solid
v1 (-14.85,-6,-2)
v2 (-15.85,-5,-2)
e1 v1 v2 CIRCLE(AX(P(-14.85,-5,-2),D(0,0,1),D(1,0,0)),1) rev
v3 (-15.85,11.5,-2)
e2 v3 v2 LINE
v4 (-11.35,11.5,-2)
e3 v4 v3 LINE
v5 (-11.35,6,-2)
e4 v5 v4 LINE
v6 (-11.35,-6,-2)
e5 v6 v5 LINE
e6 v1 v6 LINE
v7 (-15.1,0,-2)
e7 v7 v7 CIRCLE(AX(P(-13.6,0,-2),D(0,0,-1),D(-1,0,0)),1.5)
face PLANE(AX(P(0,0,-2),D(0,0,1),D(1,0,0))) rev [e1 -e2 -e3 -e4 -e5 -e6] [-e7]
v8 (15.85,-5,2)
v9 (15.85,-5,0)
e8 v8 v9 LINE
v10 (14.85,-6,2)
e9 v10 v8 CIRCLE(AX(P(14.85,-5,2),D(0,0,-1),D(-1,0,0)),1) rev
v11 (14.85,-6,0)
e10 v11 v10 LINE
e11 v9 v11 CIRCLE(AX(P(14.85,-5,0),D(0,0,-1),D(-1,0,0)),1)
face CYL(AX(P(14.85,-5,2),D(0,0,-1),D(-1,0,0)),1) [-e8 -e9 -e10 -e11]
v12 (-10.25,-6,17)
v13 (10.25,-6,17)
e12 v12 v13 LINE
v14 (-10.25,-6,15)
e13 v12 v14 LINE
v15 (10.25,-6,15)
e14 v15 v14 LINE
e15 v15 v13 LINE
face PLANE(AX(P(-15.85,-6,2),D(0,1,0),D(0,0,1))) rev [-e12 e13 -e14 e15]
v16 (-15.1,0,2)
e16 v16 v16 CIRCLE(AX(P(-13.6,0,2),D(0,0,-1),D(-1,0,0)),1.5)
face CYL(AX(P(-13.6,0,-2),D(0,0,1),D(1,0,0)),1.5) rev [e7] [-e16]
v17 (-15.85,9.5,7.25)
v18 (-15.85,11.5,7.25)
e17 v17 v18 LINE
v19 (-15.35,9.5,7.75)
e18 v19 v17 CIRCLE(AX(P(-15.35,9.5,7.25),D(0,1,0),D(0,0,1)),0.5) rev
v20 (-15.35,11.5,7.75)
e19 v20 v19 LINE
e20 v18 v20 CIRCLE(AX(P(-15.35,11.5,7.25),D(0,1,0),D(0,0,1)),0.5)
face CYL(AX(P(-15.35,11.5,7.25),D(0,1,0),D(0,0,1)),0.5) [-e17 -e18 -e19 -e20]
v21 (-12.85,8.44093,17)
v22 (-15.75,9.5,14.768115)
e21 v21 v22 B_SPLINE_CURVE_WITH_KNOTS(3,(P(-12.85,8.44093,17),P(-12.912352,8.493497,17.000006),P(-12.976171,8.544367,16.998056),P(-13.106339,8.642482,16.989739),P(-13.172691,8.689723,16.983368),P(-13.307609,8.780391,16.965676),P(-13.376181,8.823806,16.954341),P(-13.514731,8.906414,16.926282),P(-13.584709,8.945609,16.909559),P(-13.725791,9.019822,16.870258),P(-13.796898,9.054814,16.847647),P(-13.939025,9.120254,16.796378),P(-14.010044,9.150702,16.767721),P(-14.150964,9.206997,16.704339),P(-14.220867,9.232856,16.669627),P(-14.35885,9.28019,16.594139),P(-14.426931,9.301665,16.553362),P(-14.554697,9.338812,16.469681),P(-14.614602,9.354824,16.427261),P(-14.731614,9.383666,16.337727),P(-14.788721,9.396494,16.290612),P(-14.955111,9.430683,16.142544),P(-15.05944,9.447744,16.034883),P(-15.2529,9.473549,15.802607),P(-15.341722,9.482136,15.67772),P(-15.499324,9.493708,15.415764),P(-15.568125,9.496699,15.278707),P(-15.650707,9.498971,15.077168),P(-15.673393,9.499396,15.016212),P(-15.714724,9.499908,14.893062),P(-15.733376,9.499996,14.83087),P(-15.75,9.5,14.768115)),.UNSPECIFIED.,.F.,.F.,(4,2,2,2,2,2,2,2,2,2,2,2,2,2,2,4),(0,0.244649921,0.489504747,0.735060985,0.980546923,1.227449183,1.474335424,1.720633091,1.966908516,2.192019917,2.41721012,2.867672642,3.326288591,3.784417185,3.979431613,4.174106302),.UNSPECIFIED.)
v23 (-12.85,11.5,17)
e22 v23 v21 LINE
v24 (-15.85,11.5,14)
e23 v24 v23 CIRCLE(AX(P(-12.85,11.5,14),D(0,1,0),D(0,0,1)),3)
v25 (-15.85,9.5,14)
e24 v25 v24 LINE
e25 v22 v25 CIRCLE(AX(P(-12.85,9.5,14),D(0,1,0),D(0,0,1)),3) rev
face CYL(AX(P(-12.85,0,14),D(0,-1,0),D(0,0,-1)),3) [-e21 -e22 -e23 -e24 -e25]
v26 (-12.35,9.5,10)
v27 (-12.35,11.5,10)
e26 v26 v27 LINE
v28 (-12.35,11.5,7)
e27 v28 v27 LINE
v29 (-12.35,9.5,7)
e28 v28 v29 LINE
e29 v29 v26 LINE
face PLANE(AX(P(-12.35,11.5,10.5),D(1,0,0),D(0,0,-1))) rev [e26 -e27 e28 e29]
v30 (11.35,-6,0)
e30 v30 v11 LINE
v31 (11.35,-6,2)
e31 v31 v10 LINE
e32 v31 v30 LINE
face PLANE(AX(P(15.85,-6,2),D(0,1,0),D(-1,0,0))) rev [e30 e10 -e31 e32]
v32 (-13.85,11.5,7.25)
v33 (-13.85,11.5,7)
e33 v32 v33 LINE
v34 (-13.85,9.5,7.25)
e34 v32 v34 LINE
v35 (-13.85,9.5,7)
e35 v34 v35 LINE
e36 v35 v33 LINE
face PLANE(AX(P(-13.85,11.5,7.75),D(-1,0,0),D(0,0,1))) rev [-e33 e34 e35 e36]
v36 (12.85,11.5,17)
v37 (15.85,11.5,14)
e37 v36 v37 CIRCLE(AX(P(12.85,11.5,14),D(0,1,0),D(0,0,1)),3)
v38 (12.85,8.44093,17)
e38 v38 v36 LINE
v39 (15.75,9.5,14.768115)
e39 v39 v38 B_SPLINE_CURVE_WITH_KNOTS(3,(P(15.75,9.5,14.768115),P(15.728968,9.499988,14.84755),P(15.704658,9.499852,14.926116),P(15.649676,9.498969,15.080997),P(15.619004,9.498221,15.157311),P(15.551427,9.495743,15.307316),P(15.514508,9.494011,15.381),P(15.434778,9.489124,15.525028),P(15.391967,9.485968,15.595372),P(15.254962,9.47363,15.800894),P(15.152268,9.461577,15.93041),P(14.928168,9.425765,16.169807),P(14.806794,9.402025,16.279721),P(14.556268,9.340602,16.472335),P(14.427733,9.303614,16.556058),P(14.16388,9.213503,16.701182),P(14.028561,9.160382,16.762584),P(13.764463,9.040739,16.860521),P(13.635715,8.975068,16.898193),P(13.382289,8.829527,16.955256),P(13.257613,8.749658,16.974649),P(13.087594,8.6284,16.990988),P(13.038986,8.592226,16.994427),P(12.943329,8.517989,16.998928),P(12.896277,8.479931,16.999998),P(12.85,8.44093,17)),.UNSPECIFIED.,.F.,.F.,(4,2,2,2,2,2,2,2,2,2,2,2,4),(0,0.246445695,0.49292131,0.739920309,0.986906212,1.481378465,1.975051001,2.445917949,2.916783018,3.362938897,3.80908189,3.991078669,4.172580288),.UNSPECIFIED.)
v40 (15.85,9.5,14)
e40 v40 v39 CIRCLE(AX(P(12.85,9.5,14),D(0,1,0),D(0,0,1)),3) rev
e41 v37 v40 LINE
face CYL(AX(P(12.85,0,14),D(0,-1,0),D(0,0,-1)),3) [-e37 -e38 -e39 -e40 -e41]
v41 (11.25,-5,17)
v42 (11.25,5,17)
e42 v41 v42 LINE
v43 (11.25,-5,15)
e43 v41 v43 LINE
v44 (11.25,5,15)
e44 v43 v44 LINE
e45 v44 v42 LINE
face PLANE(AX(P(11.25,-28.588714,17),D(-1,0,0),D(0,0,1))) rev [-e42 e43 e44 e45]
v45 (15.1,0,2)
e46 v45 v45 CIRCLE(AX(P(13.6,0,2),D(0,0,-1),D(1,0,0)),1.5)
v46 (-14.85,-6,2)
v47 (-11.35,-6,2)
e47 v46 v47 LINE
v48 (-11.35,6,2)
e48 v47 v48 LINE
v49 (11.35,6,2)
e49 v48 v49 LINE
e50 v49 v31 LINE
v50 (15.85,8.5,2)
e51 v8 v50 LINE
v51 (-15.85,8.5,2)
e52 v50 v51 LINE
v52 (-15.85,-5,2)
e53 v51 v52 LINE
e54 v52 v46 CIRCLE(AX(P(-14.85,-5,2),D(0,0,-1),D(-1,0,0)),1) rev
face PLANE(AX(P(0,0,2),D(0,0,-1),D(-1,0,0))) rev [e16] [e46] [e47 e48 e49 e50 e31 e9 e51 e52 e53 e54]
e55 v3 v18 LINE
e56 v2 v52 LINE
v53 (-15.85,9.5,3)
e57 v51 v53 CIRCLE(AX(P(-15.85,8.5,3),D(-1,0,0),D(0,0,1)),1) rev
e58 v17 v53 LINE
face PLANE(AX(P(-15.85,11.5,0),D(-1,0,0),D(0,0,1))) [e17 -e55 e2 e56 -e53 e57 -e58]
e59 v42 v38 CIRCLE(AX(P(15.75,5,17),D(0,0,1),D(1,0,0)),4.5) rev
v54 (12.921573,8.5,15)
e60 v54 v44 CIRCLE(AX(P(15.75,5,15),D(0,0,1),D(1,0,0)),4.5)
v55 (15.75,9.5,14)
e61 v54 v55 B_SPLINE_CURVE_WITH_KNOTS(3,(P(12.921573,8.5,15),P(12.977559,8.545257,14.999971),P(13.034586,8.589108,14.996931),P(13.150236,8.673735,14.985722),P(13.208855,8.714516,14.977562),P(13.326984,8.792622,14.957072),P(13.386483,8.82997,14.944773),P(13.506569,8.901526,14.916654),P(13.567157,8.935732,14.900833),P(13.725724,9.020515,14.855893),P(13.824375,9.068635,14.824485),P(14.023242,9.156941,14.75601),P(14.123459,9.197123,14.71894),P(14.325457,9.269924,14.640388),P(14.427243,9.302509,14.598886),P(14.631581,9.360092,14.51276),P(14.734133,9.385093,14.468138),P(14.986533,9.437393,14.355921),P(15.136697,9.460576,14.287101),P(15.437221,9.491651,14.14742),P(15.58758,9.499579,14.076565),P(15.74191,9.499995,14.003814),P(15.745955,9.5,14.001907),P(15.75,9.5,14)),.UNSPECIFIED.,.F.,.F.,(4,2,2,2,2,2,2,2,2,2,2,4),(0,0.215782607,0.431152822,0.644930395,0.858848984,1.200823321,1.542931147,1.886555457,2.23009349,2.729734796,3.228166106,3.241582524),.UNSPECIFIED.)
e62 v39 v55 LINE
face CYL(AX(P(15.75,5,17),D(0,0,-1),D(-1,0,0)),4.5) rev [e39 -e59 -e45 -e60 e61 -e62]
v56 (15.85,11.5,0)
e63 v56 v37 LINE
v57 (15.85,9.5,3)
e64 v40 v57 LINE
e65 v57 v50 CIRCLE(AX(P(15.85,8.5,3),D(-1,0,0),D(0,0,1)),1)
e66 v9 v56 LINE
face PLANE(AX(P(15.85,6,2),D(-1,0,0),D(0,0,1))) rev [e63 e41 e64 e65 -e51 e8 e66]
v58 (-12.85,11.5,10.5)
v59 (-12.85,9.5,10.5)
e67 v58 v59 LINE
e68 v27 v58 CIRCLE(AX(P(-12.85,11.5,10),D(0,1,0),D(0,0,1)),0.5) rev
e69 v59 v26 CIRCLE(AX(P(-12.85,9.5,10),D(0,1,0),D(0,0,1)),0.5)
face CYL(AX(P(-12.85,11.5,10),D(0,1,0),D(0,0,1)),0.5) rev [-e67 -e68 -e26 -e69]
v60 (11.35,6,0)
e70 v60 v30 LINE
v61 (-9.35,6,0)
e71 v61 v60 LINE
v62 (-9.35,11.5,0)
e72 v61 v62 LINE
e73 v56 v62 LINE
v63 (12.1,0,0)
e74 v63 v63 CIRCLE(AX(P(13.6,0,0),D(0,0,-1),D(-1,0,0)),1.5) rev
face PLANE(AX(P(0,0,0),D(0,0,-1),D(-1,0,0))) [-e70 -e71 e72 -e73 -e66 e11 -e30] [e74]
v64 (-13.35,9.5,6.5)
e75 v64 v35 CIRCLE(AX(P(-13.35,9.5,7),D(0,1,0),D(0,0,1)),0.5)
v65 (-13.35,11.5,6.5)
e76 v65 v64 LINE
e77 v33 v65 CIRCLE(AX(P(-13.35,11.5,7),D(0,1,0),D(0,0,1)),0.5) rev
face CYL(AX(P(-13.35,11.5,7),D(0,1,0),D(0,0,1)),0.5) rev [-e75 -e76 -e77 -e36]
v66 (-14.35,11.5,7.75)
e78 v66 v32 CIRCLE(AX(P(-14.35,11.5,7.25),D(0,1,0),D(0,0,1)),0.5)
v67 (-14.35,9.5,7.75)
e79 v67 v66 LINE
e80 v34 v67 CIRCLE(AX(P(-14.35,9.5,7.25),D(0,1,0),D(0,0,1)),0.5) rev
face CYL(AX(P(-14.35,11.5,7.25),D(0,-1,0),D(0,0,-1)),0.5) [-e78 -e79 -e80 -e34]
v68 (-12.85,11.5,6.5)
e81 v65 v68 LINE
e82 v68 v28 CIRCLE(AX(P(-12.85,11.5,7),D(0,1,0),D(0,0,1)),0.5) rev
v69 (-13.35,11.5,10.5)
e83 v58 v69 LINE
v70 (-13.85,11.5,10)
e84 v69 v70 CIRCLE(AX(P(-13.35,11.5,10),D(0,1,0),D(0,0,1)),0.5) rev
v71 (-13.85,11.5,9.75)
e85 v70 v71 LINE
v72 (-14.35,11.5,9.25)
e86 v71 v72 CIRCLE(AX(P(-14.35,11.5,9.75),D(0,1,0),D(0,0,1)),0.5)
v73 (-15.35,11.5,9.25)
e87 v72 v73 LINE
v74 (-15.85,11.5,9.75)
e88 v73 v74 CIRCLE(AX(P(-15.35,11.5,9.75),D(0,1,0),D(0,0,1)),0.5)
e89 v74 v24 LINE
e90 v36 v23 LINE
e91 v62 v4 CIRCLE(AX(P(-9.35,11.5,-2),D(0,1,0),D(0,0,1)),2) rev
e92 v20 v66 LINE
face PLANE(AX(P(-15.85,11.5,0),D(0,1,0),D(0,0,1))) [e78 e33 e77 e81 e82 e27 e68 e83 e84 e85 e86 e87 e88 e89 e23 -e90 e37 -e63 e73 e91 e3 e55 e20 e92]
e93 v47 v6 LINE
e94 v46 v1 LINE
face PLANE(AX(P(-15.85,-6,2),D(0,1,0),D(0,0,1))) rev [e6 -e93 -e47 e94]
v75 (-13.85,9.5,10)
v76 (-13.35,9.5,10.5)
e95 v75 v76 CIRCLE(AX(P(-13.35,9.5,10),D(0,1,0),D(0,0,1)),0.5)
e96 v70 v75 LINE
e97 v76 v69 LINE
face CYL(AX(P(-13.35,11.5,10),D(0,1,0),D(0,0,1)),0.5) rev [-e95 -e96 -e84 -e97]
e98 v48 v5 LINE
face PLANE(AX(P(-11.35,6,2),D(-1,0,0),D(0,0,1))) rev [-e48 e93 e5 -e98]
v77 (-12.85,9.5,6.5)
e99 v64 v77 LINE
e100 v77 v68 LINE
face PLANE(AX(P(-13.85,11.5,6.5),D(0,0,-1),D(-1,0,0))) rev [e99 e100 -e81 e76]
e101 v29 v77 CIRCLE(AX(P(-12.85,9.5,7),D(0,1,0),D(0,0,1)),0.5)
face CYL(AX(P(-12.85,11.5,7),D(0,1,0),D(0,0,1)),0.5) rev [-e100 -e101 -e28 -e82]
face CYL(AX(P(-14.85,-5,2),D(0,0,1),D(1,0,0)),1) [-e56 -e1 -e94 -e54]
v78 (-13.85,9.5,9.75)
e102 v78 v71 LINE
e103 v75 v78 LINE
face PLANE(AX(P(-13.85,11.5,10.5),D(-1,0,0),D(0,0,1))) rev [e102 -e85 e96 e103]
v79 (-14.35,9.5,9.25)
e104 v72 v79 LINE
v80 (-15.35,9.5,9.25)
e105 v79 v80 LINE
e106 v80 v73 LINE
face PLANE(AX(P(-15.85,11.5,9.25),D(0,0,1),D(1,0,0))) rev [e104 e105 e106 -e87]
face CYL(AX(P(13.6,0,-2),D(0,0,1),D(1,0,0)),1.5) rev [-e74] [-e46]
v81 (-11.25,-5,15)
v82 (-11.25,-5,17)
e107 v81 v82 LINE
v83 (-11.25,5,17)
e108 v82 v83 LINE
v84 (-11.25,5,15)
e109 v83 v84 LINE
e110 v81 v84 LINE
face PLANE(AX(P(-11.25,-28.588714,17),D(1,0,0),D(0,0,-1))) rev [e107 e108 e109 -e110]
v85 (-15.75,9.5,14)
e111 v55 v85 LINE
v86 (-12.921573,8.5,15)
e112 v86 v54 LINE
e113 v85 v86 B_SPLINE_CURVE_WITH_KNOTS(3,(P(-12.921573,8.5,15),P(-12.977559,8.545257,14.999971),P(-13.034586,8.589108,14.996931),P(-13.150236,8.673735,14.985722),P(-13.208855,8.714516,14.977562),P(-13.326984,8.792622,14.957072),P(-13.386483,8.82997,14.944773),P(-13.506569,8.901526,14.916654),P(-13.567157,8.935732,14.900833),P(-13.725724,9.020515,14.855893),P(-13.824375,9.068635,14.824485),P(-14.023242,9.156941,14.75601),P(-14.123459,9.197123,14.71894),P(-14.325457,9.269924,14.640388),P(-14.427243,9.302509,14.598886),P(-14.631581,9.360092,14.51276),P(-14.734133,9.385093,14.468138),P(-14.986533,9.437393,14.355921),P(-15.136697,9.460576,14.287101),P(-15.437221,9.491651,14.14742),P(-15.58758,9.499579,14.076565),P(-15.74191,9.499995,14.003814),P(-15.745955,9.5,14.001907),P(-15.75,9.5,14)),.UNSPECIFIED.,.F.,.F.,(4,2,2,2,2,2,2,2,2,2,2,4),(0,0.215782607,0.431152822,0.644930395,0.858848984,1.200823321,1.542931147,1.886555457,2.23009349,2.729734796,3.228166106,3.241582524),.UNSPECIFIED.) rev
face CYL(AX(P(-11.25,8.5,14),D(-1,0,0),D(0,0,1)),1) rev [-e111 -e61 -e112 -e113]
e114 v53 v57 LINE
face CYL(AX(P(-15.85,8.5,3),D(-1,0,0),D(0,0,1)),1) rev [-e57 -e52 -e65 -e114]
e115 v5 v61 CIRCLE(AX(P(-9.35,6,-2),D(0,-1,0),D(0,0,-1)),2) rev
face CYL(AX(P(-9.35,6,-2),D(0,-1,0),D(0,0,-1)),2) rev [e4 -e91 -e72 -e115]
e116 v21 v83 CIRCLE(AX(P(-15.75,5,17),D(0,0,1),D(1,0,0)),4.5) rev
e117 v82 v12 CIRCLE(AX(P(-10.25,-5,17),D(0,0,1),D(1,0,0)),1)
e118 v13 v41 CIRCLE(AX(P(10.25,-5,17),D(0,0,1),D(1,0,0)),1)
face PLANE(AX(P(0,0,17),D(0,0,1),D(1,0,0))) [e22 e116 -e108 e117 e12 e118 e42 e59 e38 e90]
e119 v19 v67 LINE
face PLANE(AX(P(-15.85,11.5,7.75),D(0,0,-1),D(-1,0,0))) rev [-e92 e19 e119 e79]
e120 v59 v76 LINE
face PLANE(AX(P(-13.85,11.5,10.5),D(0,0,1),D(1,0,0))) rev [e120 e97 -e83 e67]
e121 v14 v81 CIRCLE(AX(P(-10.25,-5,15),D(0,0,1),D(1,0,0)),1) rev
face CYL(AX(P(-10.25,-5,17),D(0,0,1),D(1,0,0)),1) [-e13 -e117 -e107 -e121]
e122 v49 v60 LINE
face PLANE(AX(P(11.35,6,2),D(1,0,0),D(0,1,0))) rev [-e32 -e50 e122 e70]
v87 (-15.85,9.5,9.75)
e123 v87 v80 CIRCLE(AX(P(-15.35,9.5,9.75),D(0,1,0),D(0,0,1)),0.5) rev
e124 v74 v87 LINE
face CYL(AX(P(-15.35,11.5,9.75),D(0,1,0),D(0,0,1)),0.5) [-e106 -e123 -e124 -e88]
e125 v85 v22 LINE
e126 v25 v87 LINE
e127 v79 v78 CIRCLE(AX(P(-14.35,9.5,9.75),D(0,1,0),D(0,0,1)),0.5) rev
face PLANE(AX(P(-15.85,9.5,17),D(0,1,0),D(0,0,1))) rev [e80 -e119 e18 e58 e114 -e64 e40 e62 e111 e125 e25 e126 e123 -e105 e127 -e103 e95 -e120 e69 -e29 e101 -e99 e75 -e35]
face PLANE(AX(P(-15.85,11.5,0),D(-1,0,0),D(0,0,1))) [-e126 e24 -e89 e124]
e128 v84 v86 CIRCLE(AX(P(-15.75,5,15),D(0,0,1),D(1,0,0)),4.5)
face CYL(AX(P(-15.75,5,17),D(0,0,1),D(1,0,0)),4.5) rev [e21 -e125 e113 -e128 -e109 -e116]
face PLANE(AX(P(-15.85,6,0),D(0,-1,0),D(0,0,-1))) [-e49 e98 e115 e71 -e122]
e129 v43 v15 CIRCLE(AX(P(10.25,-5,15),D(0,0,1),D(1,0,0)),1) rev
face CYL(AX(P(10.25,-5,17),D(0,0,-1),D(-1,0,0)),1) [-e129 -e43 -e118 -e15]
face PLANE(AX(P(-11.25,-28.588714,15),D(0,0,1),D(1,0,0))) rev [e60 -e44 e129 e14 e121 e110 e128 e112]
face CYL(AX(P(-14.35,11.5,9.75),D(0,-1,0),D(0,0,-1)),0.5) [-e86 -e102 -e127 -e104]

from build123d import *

# Parameters (mm, degrees)
SKETCH_1_W          = 4.5
SKETCH_1_H          = 12
EXTRUDE_1_DEPTH     = 2
EXTRUDE_1_2_DEPTH   = 2
SKETCH_2_W          = 4.5
SKETCH_2_H          = 12
EXTRUDE_4_DEPTH     = 2
SKETCH_4_R          = 1.5
CUT_EXTRUDE_1_DEPTH = 18.413285158
SKETCH_5_W          = 31.7
SKETCH_5_H          = 5.5
EXTRUDE_5_DEPTH     = 2
SKETCH_6_W          = 31.7
SKETCH_6_H          = 2
EXTRUDE_6_DEPTH     = 15
SKETCH_7_W          = 22.5
SKETCH_7_H          = 2
EXTRUDE_7_DEPTH     = 15.5
FILLET_3_R          = 1
FILLET_4_R          = 4.5
FILLET_5_R          = 1
FILLET_6_R          = 3
SKETCH_8_W          = 4.5
SKETCH_8_H          = 2
EXTRUDE_8_DEPTH     = 5.5
FILLET_7_R          = 2
CUT_EXTRUDE_2_DEPTH = 28.936938031
FILLET_8_R          = 0.5


with BuildPart() as part:
    # 草图1 → 凸台-拉伸1 (new body)
    with BuildSketch(Plane.XY):
        with Locations((13.6, 0)):
            Rectangle(SKETCH_1_W, SKETCH_1_H)
    extrude(amount=EXTRUDE_1_DEPTH)


with BuildPart() as body_2:
    # 草图1 → Extrude 1 2 (new body)
    with BuildSketch(Plane.XY):
        with Locations((-13.6, 0)):
            Rectangle(SKETCH_1_W, SKETCH_1_H)
    extrude(amount=EXTRUDE_1_2_DEPTH)

    # 草图2 → 凸台-拉伸4 (add)
    with BuildSketch(Plane.XY):
        with Locations((-13.6, 0)):
            Rectangle(SKETCH_2_W, SKETCH_2_H)
    extrude(amount=-EXTRUDE_4_DEPTH)


with BuildPart() as cut_extrude_1_tool:
    # 草图4 → 切除-拉伸1 (new, through all)
    with BuildSketch(Plane(origin=(0, 0, 2), x_dir=(-1, 0, 0), z_dir=(0, 0, -1))):
        with Locations((13.6, 0)):
            Circle(SKETCH_4_R)
        with Locations(Location((-13.6, 0, 0), (0, 0, 180))):
            Circle(SKETCH_4_R)
    extrude(amount=CUT_EXTRUDE_1_DEPTH)


with BuildPart() as part_1:
    add(part.part)

    # 切除-拉伸1: cut by cut_extrude_1_tool
    add(cut_extrude_1_tool.part, mode=Mode.SUBTRACT)



with BuildPart() as body_2_1:
    add(body_2.part)

    # 切除-拉伸1: cut by cut_extrude_1_tool
    add(cut_extrude_1_tool.part, mode=Mode.SUBTRACT)


with BuildPart() as part_2:
    add(part_1.part)

    add(body_2_1.part)  # 凸台-拉伸5 merges body 2
    # 草图5 → 凸台-拉伸5 (add)
    with BuildSketch(Plane.XY.offset(2)):
        with Locations((0, 8.75)):
            Rectangle(SKETCH_5_W, SKETCH_5_H)
    extrude(amount=-EXTRUDE_5_DEPTH)

    # 草图6 → 凸台-拉伸6 (add)
    with BuildSketch(Plane.XY.offset(2)):
        with Locations((0, 10.5)):
            Rectangle(SKETCH_6_W, SKETCH_6_H)
    extrude(amount=EXTRUDE_6_DEPTH)

    # 草图7 → 凸台-拉伸7 (add)
    with BuildSketch(Plane.XZ.offset(-9.5)):
        with Locations((0, 16)):
            Rectangle(SKETCH_7_W, SKETCH_7_H)
    extrude(amount=EXTRUDE_7_DEPTH)

    # 圆角3
    fillet_3_edges = [part_2.edges().sort_by_distance(p)[0] for p in [
        (-15.85, -6, 0),
        (15.85, -6, 1),
        (11.25, -6, 16),
        (-11.25, -6, 16),
    ]]
    fillet(fillet_3_edges, radius=FILLET_3_R)

    # 圆角4
    fillet_4_edges = [part_2.edges().sort_by_distance(p)[0] for p in [
        (11.25, 9.5, 16),
        (-11.25, 9.5, 16),
    ]]
    fillet(fillet_4_edges, radius=FILLET_4_R)

    # 圆角5
    fillet_5_edges = [part_2.edges().sort_by_distance(p)[0] for p in [
        (0, 9.5, 2),
        (0, 9.5, 15),
    ]]
    fillet(fillet_5_edges, radius=FILLET_5_R)

    # 圆角6
    fillet_6_edges = [part_2.edges().sort_by_distance(p)[0] for p in [
        (15.85, 10.5, 17),
        (-15.85, 10.5, 17),
    ]]
    fillet(fillet_6_edges, radius=FILLET_6_R)

    # 草图8 → 凸台-拉伸8 (add)
    with BuildSketch(Plane(origin=(0, 6, 0), x_dir=(1, 0, 0), z_dir=(0, 1, 0))):
        with Locations((-13.6, 1)):
            Rectangle(SKETCH_8_W, SKETCH_8_H)
    extrude(amount=EXTRUDE_8_DEPTH)

    # 圆角7
    fillet_7_edges = [part_2.edges().sort_by_distance(p)[0] for p in [
        (-11.35, 8.75, 0),
    ]]
    fillet(fillet_7_edges, radius=FILLET_7_R - 0.0001)  # a hair under: the kernel refuses the full size

    # 草图9 → 切除-拉伸2 (cut, through all)
    with BuildSketch(Plane.XZ.offset(-9.5)):
        Polygon((-15.85, 9.25), (-13.85, 9.25), (-13.85, 10.5), (-12.35, 10.5), (-12.35, 6.5), (-13.85, 6.5), (-13.85, 7.75), (-15.85, 7.75), align=None)
    extrude(amount=-CUT_EXTRUDE_2_DEPTH, mode=Mode.SUBTRACT)

    # 圆角8
    fillet_8_edges = [part_2.edges().sort_by_distance(p)[0] for p in [
        (-15.85, 10.5, 7.75),
        (-15.85, 10.5, 9.25),
        (-13.85, 10.5, 9.25),
        (-13.85, 10.5, 10.5),
        (-12.35, 10.5, 10.5),
        (-12.35, 10.5, 6.5),
        (-13.85, 10.5, 6.5),
        (-13.85, 10.5, 7.75),
    ]]
    fillet(fillet_8_edges, radius=FILLET_8_R)


solid = part_2.part
